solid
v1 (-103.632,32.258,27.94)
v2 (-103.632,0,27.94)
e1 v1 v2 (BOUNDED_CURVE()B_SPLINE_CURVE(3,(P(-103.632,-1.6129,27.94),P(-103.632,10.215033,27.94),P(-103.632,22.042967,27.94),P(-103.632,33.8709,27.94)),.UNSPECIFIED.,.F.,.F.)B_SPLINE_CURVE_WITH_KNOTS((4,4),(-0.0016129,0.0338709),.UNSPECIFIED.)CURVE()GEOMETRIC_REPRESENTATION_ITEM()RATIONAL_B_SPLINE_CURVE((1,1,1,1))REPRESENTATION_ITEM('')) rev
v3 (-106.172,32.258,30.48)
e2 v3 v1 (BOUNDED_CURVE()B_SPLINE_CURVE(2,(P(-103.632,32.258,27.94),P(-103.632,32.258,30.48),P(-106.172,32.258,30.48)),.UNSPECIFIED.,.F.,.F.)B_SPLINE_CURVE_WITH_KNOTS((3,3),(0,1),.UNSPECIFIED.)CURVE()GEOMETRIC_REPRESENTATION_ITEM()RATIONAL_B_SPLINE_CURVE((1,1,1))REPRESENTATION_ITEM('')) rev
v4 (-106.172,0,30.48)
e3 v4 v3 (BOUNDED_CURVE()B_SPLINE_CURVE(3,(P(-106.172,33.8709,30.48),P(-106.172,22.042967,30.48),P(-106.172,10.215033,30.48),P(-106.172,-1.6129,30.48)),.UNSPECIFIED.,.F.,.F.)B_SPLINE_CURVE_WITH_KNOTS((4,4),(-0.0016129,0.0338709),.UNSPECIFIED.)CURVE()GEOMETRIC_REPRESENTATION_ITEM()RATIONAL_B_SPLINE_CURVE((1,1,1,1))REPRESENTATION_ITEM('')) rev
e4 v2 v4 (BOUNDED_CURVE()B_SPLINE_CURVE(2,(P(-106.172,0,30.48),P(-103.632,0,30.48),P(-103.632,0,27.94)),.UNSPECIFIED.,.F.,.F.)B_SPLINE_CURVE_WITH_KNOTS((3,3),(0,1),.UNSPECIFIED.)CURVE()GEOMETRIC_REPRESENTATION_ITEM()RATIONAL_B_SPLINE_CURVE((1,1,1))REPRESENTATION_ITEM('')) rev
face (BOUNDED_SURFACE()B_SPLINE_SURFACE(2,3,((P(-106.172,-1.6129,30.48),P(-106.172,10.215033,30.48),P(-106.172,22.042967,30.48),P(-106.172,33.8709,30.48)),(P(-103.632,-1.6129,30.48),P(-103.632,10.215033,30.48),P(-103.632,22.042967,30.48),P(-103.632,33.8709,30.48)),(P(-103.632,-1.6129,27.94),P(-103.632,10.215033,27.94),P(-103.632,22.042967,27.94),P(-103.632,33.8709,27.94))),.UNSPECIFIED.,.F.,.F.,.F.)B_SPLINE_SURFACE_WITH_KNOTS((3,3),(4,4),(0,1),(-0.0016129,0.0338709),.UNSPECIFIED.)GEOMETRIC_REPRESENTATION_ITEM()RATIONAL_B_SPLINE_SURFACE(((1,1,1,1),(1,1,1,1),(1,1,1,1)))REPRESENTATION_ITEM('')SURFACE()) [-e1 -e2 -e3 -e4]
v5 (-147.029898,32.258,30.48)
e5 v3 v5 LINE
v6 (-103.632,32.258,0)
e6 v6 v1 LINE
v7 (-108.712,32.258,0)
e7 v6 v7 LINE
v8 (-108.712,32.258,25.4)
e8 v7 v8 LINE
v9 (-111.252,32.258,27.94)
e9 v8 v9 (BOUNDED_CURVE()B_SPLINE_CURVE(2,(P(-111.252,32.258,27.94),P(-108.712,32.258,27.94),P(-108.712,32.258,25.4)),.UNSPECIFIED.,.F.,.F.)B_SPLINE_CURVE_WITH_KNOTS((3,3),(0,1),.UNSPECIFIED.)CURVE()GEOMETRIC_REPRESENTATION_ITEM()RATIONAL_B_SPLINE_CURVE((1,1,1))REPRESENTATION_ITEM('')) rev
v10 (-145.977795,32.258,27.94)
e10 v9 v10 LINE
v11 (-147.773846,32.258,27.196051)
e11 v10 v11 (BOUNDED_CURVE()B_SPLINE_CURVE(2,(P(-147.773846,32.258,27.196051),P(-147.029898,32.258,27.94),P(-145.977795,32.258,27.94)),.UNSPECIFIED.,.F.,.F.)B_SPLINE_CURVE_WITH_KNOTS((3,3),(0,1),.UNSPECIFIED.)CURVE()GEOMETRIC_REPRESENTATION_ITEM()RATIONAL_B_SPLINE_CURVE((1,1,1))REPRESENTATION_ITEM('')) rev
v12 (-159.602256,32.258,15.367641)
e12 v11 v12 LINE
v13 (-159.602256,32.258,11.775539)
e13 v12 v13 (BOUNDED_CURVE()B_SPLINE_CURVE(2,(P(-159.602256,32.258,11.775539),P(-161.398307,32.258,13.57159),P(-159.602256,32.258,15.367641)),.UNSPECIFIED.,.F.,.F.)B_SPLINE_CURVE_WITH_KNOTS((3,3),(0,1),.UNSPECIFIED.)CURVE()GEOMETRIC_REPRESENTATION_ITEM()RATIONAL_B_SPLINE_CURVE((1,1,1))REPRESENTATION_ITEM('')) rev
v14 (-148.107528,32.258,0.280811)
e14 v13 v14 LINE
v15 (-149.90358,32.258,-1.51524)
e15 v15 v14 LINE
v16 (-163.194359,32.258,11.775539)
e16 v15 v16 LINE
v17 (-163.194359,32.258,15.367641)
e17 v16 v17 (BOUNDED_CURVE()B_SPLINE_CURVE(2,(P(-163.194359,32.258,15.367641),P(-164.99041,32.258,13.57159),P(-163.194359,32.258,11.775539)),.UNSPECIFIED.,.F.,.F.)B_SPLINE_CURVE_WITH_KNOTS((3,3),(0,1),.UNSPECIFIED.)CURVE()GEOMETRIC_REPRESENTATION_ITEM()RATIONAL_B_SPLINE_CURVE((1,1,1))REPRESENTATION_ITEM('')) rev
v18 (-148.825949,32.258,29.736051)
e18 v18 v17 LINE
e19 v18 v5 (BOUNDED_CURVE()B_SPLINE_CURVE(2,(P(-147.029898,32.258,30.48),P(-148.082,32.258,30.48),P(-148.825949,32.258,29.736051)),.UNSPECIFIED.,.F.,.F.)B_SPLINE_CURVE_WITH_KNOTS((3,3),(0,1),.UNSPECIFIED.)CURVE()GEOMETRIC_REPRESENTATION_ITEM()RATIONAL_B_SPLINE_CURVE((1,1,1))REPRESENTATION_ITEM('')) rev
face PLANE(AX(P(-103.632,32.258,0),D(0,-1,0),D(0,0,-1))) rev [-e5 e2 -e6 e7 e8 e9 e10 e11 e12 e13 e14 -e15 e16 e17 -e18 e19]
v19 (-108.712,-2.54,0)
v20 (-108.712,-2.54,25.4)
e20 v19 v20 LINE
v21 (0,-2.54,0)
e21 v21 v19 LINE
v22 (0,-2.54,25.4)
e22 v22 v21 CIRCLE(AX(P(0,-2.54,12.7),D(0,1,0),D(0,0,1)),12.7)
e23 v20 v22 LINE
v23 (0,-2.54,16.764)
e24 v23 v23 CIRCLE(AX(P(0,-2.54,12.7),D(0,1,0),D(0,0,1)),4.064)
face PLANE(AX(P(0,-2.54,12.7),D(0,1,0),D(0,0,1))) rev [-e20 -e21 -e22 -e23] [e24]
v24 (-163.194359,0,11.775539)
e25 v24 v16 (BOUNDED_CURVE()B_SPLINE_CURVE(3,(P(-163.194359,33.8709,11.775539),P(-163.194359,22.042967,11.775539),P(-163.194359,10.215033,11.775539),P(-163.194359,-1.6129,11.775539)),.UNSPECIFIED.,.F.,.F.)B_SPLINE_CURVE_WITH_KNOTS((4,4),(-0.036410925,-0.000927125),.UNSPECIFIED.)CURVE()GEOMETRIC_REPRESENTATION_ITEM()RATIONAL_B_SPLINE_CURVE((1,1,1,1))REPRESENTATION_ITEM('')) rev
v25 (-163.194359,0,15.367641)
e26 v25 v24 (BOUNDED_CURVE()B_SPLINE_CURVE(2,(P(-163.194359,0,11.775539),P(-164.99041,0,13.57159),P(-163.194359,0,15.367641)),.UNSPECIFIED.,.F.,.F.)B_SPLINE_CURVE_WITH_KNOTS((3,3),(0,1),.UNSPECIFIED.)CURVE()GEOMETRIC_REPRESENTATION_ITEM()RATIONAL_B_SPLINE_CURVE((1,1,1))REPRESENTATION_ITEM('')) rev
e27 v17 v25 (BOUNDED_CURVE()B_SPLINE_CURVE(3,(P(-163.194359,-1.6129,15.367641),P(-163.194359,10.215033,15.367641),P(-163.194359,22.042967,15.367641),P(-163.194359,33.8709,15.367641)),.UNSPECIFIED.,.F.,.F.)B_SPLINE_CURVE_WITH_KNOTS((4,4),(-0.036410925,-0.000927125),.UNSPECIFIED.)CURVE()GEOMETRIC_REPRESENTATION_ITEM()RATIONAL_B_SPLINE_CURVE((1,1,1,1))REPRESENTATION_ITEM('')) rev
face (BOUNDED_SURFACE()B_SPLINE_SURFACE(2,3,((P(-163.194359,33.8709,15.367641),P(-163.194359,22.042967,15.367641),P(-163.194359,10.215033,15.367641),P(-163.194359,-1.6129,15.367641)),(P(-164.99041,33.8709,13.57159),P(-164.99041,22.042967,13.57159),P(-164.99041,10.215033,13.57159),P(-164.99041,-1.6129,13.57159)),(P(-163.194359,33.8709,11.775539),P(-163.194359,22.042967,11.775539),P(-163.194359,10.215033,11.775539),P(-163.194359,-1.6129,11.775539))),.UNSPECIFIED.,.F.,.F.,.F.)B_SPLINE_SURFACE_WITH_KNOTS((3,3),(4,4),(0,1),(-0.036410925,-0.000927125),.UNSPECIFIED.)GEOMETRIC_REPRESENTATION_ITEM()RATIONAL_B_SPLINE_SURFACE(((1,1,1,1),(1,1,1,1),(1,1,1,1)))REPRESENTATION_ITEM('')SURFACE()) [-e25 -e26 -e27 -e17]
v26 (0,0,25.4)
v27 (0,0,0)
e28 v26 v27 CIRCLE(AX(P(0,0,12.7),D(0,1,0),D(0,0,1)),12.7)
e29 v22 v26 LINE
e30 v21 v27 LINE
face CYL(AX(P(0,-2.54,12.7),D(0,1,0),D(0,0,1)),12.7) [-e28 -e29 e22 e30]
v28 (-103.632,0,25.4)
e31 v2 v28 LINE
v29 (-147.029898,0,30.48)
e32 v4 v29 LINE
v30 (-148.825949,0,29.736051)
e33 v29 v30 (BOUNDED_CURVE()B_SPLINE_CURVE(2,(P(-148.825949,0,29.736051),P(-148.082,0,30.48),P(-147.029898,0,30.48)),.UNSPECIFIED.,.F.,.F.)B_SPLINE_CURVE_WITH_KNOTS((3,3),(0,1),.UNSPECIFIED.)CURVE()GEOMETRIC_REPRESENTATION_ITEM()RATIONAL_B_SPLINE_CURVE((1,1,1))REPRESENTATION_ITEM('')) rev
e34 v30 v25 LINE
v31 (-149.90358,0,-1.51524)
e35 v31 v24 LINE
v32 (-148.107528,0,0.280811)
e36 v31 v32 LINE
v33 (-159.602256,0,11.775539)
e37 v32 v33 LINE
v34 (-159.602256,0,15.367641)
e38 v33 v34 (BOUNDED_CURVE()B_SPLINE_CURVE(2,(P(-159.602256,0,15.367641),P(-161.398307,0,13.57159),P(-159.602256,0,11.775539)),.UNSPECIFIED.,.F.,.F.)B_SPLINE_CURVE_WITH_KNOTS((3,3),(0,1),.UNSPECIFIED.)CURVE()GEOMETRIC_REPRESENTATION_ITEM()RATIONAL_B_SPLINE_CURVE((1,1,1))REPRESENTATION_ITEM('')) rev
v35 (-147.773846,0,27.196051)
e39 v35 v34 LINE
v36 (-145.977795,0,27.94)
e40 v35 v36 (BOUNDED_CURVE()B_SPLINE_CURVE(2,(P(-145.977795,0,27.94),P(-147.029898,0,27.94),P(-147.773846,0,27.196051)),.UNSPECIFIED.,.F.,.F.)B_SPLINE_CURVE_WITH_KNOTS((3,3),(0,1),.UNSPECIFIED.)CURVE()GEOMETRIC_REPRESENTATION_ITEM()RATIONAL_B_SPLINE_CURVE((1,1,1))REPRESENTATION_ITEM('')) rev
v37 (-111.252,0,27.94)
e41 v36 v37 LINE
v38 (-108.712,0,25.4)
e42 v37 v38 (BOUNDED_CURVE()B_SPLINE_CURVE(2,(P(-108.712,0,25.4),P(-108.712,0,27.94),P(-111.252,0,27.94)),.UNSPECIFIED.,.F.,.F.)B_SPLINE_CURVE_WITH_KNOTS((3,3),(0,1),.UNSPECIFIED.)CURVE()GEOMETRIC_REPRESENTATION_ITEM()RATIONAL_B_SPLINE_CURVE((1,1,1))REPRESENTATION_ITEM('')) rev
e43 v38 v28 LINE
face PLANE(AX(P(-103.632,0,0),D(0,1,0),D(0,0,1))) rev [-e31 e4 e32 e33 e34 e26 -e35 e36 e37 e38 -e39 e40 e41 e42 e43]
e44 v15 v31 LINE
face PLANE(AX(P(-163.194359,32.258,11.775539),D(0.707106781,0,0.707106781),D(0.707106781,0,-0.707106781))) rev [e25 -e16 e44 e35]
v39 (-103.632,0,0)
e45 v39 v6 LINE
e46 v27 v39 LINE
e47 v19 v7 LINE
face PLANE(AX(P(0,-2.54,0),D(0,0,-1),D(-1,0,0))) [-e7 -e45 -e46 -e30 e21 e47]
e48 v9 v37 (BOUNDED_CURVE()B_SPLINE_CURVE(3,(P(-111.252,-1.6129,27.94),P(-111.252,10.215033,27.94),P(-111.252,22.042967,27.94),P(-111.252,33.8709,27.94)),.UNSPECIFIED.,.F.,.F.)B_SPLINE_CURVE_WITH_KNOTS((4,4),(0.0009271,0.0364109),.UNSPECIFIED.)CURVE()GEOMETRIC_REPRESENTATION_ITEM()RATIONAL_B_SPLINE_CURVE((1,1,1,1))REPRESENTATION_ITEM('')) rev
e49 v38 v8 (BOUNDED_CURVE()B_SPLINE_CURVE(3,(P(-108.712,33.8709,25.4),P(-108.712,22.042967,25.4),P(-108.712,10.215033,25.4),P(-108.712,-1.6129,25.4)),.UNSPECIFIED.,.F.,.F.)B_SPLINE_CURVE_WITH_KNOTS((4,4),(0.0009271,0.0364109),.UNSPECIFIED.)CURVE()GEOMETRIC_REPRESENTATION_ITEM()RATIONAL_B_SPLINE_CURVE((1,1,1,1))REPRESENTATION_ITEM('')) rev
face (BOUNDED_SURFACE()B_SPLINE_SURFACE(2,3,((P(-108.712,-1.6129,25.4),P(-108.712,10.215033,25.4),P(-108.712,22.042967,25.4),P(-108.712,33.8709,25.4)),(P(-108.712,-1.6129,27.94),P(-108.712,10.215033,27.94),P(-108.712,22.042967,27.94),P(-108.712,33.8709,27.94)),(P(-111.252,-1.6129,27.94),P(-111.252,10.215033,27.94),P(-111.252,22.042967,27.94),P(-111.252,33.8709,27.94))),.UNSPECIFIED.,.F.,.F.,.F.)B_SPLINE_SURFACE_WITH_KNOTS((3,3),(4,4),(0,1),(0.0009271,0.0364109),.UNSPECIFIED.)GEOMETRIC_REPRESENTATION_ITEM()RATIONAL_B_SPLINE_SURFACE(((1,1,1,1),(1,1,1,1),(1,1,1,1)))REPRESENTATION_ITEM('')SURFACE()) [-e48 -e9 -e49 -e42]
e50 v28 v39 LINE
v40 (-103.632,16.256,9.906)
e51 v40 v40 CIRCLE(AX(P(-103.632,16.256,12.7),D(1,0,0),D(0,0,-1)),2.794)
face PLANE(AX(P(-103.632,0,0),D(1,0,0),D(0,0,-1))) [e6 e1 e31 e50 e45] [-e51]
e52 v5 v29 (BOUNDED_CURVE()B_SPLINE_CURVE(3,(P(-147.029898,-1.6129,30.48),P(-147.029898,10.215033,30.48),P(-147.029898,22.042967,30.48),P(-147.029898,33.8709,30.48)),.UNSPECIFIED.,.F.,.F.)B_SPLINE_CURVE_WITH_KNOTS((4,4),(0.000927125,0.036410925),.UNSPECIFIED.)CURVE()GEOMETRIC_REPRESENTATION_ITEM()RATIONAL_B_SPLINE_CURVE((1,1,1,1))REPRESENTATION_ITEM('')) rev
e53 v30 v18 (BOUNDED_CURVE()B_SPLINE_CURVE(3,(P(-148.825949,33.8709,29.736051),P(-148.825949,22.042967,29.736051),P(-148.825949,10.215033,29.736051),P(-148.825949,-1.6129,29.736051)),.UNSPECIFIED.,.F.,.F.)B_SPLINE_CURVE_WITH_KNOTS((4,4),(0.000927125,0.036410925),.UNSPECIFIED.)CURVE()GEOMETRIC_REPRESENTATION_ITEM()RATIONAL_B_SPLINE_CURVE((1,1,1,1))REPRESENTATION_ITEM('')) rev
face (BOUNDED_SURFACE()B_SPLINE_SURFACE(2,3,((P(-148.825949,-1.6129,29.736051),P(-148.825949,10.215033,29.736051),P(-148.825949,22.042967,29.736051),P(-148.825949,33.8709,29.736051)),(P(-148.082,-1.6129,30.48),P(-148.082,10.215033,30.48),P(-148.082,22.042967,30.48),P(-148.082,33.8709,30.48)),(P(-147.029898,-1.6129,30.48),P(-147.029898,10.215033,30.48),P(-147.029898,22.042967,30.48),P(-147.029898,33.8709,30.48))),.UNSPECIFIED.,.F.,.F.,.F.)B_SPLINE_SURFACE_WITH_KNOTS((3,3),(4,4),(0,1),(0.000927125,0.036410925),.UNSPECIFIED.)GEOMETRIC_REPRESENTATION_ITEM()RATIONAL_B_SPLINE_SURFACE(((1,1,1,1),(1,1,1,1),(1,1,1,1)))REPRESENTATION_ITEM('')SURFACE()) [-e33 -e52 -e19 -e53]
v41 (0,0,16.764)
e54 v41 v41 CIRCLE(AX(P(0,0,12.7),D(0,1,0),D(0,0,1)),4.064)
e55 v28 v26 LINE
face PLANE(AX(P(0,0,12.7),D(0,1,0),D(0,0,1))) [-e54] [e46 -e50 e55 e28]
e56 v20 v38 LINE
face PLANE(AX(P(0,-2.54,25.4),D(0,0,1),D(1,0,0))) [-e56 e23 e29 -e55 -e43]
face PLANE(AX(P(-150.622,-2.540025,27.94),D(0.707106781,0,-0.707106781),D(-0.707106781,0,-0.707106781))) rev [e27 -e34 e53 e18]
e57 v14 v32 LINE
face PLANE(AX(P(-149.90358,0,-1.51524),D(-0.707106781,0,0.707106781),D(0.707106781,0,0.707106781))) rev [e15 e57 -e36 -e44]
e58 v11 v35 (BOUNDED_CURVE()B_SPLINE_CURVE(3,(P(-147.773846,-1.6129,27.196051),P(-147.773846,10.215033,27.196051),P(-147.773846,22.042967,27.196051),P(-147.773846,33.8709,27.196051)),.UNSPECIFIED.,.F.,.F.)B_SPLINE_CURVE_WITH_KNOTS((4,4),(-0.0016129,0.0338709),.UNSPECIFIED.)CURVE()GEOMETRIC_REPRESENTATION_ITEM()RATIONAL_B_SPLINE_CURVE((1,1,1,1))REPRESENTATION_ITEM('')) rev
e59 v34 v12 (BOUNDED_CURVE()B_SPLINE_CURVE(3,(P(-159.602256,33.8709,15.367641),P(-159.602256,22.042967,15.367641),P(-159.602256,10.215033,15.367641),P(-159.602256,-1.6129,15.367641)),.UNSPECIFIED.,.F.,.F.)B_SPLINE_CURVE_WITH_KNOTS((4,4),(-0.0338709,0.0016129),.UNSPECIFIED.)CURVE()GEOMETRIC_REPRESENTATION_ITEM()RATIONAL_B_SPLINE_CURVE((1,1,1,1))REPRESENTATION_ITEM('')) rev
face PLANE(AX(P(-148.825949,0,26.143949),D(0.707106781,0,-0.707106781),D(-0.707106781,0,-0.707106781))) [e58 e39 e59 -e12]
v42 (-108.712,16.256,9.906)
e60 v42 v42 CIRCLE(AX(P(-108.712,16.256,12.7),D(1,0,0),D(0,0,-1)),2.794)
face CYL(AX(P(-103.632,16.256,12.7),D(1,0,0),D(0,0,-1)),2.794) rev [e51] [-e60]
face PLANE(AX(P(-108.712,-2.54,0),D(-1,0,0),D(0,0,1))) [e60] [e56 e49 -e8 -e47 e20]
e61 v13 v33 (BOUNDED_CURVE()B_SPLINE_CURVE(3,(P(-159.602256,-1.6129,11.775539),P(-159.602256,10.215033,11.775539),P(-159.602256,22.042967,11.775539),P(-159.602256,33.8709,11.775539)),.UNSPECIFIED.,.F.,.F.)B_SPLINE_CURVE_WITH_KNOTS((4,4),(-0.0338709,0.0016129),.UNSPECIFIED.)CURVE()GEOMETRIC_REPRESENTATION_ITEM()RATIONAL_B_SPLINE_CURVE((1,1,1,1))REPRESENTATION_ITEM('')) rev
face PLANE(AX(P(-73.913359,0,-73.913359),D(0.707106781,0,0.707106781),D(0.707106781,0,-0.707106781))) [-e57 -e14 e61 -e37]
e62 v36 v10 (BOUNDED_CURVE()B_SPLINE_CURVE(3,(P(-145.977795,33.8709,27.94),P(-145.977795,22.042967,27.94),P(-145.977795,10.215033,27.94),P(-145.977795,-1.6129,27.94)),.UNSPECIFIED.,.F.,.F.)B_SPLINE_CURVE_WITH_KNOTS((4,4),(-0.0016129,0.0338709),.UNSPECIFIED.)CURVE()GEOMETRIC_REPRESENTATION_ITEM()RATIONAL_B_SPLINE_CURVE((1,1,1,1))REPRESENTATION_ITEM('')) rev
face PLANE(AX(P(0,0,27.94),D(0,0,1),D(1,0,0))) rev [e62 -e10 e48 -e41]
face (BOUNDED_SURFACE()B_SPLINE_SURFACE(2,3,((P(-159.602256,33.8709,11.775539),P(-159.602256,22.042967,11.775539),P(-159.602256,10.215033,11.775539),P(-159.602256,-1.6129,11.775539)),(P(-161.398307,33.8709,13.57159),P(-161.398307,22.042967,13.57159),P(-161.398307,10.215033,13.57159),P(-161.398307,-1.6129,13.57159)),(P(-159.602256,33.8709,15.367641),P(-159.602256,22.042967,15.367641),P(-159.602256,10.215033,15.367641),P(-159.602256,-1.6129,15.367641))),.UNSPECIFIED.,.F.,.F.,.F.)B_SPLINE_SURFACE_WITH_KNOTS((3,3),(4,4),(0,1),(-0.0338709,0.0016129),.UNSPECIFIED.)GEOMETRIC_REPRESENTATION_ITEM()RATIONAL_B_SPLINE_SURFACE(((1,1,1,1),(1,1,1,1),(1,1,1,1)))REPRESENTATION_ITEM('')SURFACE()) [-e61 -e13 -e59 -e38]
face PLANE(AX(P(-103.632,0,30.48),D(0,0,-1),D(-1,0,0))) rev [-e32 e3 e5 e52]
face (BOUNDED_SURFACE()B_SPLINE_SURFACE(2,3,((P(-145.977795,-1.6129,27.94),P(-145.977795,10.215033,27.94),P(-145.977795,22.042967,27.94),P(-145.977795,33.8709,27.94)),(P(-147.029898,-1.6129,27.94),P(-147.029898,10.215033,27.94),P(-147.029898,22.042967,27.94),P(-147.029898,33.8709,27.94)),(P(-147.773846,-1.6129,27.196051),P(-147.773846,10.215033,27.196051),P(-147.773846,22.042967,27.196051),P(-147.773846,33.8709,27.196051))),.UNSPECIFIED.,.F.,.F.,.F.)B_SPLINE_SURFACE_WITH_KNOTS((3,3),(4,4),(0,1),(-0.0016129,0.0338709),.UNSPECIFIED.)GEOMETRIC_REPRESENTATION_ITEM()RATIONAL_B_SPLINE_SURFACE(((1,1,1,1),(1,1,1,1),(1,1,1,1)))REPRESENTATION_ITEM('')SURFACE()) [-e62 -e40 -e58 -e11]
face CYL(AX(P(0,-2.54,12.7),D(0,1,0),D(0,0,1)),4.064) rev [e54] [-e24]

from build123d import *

# Parameters (mm, degrees)
SKETCH1_R                   = 4.064
BOSS_EXTRUDE1_DEPTH         = 2.54
SKETCH2_W                   = 30.48
SKETCH2_H                   = 32.258
BOSS_EXTRUDE2_DEPTH         = 5.08
SKETCH3_W                   = 41.91
SKETCH3_H                   = 32.258
BOSS_EXTRUDE3_DEPTH         = 2.54
FILLET1_SIZE                = 2.54
CUT_EXTRUDE1_DEPTH          = 158.565599432
SKETCH5_W                   = 17.78
SKETCH5_H                   = 32.258
BOSS_EXTRUDE4_DEPTH         = 2.54
BOSS_EXTRUDE5_DEPTH         = 32.258
SKETCH9_W                   = 18.796
SKETCH9_H                   = 32.258
BOSS_EXTRUDE6_DEPTH         = 2.54
BOSS_EXTRUDE7_DEPTH         = 32.258
FILLET3_SIZE                = 2.54
W_0_22_DIAMETER_HOLE1_D     = 5.588
W_0_22_DIAMETER_HOLE1_DEPTH = 5.08
W_0_22_DIAMETER_HOLE1_TIP   = 1.67880457


with BuildPart() as part:
    # Sketch1 → Boss-Extrude1 (new body)
    with BuildSketch(Plane(origin=(0, 0, 0), x_dir=(1, 0, 0), z_dir=(0, 1, 0))):
        with BuildLine():
            Line((0, 0), (-108.712, 0))
            Line((-108.712, 0), (-108.712, -25.4))
            Line((-108.712, -25.4), (0, -25.4))
            ThreePointArc((0, -25.4), (12.7, -12.7), (0, 0))
        make_face()
        with Locations(Location((0, -12.7, 0), (0, 0, 270))):
            Circle(SKETCH1_R, mode=Mode.SUBTRACT)
    extrude(amount=-BOSS_EXTRUDE1_DEPTH)

    # Sketch2 → Boss-Extrude2 (add)
    with BuildSketch(Plane(origin=(-108.712, 0, 0), x_dir=(0, 0, -1), z_dir=(1, 0, 0))):
        with Locations((-15.24, 16.129)):
            Rectangle(SKETCH2_W, SKETCH2_H)
    extrude(amount=BOSS_EXTRUDE2_DEPTH)

    # Sketch3 → Boss-Extrude3 (add)
    with BuildSketch(Plane.XY.offset(30.48)):
        with Locations((-129.667, 16.129)):
            Rectangle(SKETCH3_W, SKETCH3_H)
    extrude(amount=-BOSS_EXTRUDE3_DEPTH)

    # Fillet1
    # a fillet whose section is not a circle: 2.54 mm, written as the material it adds along each edge
    with BuildSketch(Plane(origin=(-108.712, 0, 27.94), x_dir=(0, 0, -1), z_dir=(0, 1, 0))) as fillet1_piece_1:
        with BuildLine():
            Bezier((FILLET1_SIZE, 0), (0, 0), (0, FILLET1_SIZE), weights=[1, 1, 1])
            Line((0, FILLET1_SIZE), (0, 0))
            Line((0, 0), (FILLET1_SIZE, 0))
        make_face()
    extrude(amount=32.258)
    # a fillet whose section is not a circle: 2.54 mm, written as the material it takes off along each edge
    with BuildSketch(Plane(origin=(-103.632, -6.35, 30.48), x_dir=(0, 0, -1), z_dir=(0, 1, 0))) as fillet1_2_piece_1:
        with BuildLine():
            Bezier((FILLET1_SIZE, 0), (0, 0), (0, FILLET1_SIZE), weights=[1, 1, 1])
            Line((0, FILLET1_SIZE), (0, 0))
            Line((0, 0), (FILLET1_SIZE, 0))
        make_face()
    extrude(amount=44.958, mode=Mode.SUBTRACT)

    # Sketch4 → Cut-Extrude1 (cut, through all)
    with BuildSketch(Plane(origin=(0, 32.258, 0), x_dir=(1, 0, 0), z_dir=(0, 1, 0))):
        Polygon((-150.622, -27.94), (-148.082, -30.48), (-150.622, -30.48), align=None)
    extrude(amount=-CUT_EXTRUDE1_DEPTH, mode=Mode.SUBTRACT)



with BuildPart() as body_2:
    # Sketch5 → Boss-Extrude4 (new body)
    with BuildSketch(Plane(origin=(-89.281, 0, 89.281), x_dir=(0.7071067811865327, 0, 0.7071067811865624), z_dir=(-0.7071067811865624, 0, 0.7071067811865327))):
        with Locations((-95.63927413, 16.129)):
            Rectangle(SKETCH5_W, SKETCH5_H)
    extrude(amount=-BOSS_EXTRUDE4_DEPTH)


with BuildPart() as part_1:
    add(part.part)

    add(body_2.part)  # Boss-Extrude5 merges body 2
    # Sketch6 → Boss-Extrude5 (add)
    with BuildSketch(Plane(origin=(0, 32.258, 0), x_dir=(1, 0, 0), z_dir=(0, 1, 0))):
        Polygon((-150.622, -27.94), (-147.029897552, -27.94), (-148.825948776, -26.143948776), align=None)
    extrude(amount=-BOSS_EXTRUDE5_DEPTH)

    # Fillet2
    # a fillet whose section is not a circle: 2.54 mm, written as the material it adds along each edge
    with BuildSketch(Plane(origin=(-147.029897552, 32.258, 27.94), x_dir=(-0.7071067811865357, 0, -0.7071067811865592), z_dir=(0, -1, 0))) as fillet2_piece_1:
        with BuildLine():
            Bezier((1.052102448, 0), (0, 0), (-0.743948776, 0.743948776), weights=[1, 1, 1])
            Line((-0.743948776, 0.743948776), (0, 0))
            Line((0, 0), (1.052102448, 0))
        make_face()
    extrude(amount=32.258)
    # a fillet whose section is not a circle: 2.54 mm, written as the material it takes off along each edge
    with BuildSketch(Plane(origin=(-148.082, 34.888256121, 30.48), x_dir=(-0.707106781186539, 0, -0.707106781186556), z_dir=(0, -1, 0))) as fillet2_2_piece_1:
        with BuildLine():
            Bezier((1.052102448, 0), (0, 0), (-0.743948776, 0.743948776), weights=[1, 1, 1])
            Line((-0.743948776, 0.743948776), (0, 0))
            Line((0, 0), (1.052102448, 0))
        make_face()
    extrude(amount=37.518512242, mode=Mode.SUBTRACT)



with BuildPart() as body_2_2:
    # Sketch9 → Boss-Extrude6 (new body)
    with BuildSketch(Plane(origin=(-73.913358569, 0, -73.913358569), x_dir=(-0.7071067811865623, 0, 0.7071067811865328), z_dir=(-0.7071067811865328, 0, -0.7071067811865623))):
        with Locations((114.324401062, 16.129)):
            Rectangle(SKETCH9_W, SKETCH9_H)
    extrude(amount=BOSS_EXTRUDE6_DEPTH)


with BuildPart() as part_2:
    add(part_1.part)

    add(body_2_2.part)  # Boss-Extrude7 merges body 2 2
    # Sketch10 → Boss-Extrude7 (add)
    with BuildSketch(Plane(origin=(0, 0, 0), x_dir=(1, 0, 0), z_dir=(0, 1, 0))):
        Polygon((-161.398307345, -13.571590206), (-163.194358569, -11.775538982), (-164.990409794, -13.571590206), (-163.194358569, -15.367641431), align=None)
    extrude(amount=BOSS_EXTRUDE7_DEPTH)

    # Fillet3
    # a fillet whose section is not a circle: 2.54 mm, written as the material it adds along each edge
    with BuildSketch(Plane(origin=(-161.398307345, 32.258, 13.571590206), x_dir=(0.7071067811865611, 0, -0.7071067811865339), z_dir=(0, -1, 0))) as fillet3_piece_1:
        with BuildLine():
            Bezier((FILLET3_SIZE, 0), (0, 0), (0, FILLET3_SIZE), weights=[1, 1, 1])
            Line((0, FILLET3_SIZE), (0, 0))
            Line((0, 0), (FILLET3_SIZE, 0))
        make_face()
    extrude(amount=32.258)
    # a fillet whose section is not a circle: 2.54 mm, written as the material it takes off along each edge
    with BuildSketch(Plane(origin=(-164.990409794, -6.35, 13.571590206), x_dir=(0.7071067811865199, 0, 0.7071067811865752), z_dir=(0, 1, 0))) as fillet3_2_piece_1:
        with BuildLine():
            Bezier((FILLET3_SIZE, 0), (0, 0), (0, FILLET3_SIZE), weights=[1, 1, 1])
            Line((0, FILLET3_SIZE), (0, 0))
            Line((0, 0), (FILLET3_SIZE, 0))
        make_face()
    extrude(amount=44.958, mode=Mode.SUBTRACT)

    # W (0.22) Diameter Hole1
    with Locations(Plane(origin=(-103.632, 16.256, 12.7), x_dir=(0, 0, 1), z_dir=(1, 0, 0))):
        with Locations((0, 0)):
            Hole(W_0_22_DIAMETER_HOLE1_D / 2, depth=W_0_22_DIAMETER_HOLE1_DEPTH)
            with Locations((0, 0, -(W_0_22_DIAMETER_HOLE1_DEPTH + W_0_22_DIAMETER_HOLE1_TIP / 2))):  # 118° drill point
                Cone(0, W_0_22_DIAMETER_HOLE1_D / 2, W_0_22_DIAMETER_HOLE1_TIP, mode=Mode.SUBTRACT)


solid = part_2.part
